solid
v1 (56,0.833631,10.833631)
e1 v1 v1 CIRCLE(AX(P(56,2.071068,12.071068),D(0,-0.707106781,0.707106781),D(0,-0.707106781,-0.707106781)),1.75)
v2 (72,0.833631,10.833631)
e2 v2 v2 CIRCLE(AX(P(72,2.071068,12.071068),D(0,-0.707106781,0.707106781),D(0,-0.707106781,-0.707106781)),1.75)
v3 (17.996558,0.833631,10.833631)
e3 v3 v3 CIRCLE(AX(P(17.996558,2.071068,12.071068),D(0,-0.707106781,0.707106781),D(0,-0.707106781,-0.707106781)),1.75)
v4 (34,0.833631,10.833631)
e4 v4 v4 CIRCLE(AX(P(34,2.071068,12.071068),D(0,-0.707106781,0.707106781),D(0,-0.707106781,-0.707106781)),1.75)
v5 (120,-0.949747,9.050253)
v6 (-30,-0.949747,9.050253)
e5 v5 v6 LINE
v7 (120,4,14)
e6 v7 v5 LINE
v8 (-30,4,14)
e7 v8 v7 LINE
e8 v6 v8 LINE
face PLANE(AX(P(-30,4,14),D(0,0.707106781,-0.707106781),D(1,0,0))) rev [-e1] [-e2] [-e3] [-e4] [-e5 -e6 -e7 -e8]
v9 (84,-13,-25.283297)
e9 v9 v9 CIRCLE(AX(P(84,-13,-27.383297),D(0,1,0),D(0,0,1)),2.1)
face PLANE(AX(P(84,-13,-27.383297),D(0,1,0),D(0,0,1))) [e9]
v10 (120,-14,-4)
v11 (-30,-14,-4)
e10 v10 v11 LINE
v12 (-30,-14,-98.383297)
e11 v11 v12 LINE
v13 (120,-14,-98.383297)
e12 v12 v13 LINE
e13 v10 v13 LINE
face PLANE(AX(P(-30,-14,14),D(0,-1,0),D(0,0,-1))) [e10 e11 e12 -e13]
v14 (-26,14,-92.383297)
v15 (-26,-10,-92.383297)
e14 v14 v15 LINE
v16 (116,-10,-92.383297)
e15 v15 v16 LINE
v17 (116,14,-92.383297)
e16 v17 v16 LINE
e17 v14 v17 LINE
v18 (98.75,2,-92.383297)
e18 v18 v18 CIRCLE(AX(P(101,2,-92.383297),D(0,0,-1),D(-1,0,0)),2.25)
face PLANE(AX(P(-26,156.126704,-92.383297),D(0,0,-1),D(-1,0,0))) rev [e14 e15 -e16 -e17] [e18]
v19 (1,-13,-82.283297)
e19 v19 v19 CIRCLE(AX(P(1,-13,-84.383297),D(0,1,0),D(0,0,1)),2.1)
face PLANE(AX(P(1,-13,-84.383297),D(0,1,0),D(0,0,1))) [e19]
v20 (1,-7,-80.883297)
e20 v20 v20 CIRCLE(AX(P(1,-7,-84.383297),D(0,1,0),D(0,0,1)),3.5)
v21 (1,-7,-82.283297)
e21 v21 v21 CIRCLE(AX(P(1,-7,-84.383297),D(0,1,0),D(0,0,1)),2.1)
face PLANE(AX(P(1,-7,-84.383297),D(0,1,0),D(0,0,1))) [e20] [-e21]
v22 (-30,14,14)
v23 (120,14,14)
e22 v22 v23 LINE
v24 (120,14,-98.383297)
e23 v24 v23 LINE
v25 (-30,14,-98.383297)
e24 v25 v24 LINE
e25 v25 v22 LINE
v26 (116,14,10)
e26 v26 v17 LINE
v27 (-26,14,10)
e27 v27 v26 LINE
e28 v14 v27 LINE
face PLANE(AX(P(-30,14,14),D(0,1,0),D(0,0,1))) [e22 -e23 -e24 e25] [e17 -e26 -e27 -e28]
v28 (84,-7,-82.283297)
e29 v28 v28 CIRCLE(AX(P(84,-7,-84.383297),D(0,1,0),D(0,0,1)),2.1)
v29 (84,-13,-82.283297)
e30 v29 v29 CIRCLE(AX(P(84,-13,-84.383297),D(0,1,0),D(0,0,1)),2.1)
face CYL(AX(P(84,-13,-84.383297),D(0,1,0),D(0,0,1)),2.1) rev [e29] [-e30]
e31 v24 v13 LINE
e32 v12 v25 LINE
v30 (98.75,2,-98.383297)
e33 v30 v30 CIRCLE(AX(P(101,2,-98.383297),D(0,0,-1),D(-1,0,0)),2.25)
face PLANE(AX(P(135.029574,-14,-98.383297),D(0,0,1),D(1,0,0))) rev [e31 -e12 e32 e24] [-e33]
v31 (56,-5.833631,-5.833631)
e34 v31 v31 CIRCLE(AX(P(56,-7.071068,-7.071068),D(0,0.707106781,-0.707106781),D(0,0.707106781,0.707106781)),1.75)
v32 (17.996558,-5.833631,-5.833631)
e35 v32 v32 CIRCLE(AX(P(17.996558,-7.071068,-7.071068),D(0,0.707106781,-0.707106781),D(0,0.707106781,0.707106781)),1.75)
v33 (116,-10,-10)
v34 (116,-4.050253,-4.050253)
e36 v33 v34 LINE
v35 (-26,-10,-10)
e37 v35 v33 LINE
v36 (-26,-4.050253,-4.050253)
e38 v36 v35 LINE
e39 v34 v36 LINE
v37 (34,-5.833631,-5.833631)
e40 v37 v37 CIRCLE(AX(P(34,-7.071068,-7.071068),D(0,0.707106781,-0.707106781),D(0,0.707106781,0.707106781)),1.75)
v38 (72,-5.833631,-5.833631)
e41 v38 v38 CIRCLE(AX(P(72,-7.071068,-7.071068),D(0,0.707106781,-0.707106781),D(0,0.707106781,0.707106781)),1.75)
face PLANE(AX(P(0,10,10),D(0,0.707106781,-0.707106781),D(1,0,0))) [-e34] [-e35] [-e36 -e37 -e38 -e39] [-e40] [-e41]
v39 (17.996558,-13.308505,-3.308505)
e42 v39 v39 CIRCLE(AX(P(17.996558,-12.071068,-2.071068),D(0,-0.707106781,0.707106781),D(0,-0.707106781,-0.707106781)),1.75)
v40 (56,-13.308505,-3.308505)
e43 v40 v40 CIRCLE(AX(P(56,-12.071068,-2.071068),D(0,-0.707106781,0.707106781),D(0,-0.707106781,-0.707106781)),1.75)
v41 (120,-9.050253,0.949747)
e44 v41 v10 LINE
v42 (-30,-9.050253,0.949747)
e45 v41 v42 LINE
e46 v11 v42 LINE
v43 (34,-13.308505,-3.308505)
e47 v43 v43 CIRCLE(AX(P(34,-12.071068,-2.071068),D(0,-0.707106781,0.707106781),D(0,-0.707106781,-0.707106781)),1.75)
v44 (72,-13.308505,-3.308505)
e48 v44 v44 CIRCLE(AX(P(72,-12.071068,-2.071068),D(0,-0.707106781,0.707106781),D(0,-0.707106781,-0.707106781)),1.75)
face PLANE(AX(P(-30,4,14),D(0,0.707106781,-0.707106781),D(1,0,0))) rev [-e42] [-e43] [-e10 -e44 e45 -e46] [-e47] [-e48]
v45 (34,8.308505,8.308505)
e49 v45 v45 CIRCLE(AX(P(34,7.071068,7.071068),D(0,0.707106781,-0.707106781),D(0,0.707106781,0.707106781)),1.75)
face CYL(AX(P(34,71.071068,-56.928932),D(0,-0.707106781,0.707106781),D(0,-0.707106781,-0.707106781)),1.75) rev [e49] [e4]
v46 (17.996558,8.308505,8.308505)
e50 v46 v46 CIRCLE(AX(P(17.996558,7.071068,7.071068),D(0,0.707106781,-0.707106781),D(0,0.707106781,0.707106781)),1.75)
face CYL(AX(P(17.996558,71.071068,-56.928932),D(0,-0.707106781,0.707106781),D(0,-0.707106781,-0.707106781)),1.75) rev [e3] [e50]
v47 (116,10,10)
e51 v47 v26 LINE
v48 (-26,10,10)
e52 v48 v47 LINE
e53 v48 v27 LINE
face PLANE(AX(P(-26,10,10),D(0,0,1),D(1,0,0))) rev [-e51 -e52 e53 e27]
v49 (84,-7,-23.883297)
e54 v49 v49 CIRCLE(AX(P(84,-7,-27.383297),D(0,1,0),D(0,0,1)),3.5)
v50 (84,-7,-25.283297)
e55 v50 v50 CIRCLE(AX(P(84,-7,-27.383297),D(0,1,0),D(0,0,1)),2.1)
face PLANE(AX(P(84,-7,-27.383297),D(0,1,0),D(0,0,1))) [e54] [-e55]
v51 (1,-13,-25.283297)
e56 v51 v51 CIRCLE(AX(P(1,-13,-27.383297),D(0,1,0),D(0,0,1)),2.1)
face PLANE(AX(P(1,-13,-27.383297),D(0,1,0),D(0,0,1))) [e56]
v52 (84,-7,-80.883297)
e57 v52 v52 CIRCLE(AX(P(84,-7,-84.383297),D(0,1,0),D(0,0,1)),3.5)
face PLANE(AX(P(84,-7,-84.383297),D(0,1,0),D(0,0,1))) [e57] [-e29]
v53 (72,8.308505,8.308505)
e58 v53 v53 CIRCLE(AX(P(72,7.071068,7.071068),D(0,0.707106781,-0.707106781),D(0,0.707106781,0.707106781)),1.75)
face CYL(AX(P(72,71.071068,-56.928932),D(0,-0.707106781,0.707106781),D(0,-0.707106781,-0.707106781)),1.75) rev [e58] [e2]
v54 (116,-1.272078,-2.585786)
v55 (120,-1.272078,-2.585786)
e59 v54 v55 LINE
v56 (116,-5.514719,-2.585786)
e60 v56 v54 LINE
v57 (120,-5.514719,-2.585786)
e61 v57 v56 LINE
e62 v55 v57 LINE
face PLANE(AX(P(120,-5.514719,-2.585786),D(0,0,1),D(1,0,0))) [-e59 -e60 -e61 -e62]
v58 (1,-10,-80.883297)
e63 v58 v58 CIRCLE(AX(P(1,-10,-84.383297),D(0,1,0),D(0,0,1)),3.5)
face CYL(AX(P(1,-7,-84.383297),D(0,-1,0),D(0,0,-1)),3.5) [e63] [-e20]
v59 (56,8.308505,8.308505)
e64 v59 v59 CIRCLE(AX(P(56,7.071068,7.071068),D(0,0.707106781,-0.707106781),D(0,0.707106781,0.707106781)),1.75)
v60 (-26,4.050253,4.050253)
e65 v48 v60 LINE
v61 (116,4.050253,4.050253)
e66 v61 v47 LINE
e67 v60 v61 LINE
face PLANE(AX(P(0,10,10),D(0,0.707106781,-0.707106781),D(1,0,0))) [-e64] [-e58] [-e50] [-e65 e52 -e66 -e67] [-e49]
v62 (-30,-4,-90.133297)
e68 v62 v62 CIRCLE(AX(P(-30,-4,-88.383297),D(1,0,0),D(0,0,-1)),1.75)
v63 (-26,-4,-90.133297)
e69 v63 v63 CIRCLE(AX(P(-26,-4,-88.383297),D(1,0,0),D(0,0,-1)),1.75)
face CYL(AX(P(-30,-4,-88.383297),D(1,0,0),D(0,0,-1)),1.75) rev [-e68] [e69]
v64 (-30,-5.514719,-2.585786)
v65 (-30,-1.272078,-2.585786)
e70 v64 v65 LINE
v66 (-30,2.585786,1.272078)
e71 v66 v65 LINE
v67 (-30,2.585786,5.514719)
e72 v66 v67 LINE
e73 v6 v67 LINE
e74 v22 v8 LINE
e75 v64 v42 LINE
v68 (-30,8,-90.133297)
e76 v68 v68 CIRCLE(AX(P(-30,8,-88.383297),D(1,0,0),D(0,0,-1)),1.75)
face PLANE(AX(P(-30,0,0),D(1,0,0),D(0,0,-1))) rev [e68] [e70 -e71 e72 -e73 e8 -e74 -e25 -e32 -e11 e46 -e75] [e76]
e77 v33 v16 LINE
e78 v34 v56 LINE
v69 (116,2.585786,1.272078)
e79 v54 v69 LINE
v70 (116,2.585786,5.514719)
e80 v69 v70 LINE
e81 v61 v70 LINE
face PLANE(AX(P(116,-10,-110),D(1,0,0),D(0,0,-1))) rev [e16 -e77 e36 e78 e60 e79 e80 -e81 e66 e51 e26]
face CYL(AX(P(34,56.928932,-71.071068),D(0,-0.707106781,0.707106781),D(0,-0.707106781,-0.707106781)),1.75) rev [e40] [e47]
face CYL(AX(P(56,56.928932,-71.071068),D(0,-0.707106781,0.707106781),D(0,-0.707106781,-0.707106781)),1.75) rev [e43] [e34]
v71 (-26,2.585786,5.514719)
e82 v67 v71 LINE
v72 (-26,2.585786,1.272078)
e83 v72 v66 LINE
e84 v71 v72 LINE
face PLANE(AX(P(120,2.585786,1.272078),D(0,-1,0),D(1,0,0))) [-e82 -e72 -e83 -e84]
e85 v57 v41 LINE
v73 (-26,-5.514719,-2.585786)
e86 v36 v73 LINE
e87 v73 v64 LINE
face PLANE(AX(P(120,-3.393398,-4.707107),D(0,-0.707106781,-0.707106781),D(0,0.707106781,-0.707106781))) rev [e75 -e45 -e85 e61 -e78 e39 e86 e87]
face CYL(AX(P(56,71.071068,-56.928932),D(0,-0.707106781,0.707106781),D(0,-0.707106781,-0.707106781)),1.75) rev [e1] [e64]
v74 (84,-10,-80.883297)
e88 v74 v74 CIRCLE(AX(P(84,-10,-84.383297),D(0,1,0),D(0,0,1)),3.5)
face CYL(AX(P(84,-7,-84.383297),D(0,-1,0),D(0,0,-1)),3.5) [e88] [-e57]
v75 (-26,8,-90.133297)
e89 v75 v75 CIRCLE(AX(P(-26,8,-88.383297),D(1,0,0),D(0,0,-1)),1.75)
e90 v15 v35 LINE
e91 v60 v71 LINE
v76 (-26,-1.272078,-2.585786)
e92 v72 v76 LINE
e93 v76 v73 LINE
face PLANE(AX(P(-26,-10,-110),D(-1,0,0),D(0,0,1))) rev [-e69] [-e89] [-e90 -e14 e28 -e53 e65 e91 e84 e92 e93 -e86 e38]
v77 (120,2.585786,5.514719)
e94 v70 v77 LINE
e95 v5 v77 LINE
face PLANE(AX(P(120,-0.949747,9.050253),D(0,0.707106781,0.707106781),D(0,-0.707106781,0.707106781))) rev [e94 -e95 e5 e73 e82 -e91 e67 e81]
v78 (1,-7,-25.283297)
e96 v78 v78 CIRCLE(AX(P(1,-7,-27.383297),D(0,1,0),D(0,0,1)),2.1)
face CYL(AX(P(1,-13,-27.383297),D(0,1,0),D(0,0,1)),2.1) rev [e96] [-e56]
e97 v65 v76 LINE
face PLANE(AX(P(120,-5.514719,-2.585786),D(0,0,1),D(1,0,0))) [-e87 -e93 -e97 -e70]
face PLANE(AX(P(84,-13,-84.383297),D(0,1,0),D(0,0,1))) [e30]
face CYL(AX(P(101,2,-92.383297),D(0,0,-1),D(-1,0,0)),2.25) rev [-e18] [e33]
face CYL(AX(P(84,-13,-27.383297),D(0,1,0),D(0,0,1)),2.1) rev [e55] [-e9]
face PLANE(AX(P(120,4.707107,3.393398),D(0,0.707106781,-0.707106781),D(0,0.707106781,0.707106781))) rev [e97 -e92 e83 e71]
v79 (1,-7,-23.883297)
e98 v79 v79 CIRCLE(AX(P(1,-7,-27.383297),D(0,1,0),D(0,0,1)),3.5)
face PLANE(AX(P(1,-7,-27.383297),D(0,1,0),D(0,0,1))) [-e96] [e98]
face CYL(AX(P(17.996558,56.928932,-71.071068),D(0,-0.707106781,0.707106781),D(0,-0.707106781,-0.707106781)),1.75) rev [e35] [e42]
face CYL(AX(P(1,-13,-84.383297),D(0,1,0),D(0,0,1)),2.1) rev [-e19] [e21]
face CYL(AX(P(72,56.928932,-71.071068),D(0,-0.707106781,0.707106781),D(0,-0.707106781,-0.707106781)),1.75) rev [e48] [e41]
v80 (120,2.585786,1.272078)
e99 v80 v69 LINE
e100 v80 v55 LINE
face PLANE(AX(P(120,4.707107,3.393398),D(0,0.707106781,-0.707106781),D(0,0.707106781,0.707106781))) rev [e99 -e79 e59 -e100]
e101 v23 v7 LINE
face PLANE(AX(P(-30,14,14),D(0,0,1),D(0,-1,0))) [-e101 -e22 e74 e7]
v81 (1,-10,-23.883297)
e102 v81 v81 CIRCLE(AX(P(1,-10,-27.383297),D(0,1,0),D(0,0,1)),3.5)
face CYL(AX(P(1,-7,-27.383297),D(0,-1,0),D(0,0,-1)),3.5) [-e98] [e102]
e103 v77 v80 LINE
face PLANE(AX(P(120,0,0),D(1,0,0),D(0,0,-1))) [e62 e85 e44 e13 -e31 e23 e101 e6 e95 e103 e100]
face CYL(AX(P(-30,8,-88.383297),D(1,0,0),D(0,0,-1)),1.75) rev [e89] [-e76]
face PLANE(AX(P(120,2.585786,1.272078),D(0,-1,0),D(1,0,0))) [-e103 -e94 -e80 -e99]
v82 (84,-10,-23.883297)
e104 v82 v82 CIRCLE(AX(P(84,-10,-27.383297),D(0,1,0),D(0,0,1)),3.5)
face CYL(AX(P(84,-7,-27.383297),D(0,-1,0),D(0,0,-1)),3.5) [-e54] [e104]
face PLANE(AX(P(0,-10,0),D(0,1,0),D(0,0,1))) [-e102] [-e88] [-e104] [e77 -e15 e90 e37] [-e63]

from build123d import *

# Parameters (mm, degrees)
BOSS_EXTRUDE1_DEPTH      = 120
BOSS_EXTRUDE1_DEPTH_BACK = 30
SKETCH1_W                = 28
SKETCH1_H                = 28
CHAMFER1_SIZE            = 18
SKETCH2_W                = 150
SKETCH2_H                = 28
BOSS_EXTRUDE2_DEPTH      = 100
SKETCH3_W                = 142
SKETCH3_H                = 100
CUT_EXTRUDE1_DEPTH       = 24
SKETCH4_W                = 142
SKETCH4_H                = 20
CUT_EXTRUDE2_DEPTH       = 4
CHAMFER2_SIZE            = 20
SKETCH6_R                = 1.75
CUT_EXTRUDE3_DEPTH       = 171.064693573
SKETCH10_W               = 165.029573665
SKETCH10_H               = 25.818236019
CUT_EXTRUDE7_DEPTH       = 168.868996542
CUT_EXTRUDE8_DEPTH       = 180.931301028
CHAMFER3_SIZE            = 3
SKETCH12_W               = 142
SKETCH12_H               = 11.455844122
CUT_EXTRUDE9_DEPTH       = 160.52775952
SKETCH13_W               = 142
SKETCH13_H               = 6
BOSS_EXTRUDE4_DEPTH      = 24
SKETCH14_R               = 2.25
CUT_EXTRUDE10_DEPTH      = 6
SKETCH15_R               = 1.75
CUT_EXTRUDE11_DEPTH      = 177.610512398
SKETCH17_R               = 3.5
BOSS_EXTRUDE5_DEPTH      = 3
SKETCH18_R               = 2.1
CUT_EXTRUDE12_DEPTH      = 6


with BuildPart() as part:
    # Sketch1 → Boss-Extrude1 (new, two sides: drawn at the far end of the back side and taken through both)
    with BuildSketch(Plane(origin=(0, 0, 0), x_dir=(0, 0, -1), z_dir=(1, 0, 0)).offset(-BOSS_EXTRUDE1_DEPTH_BACK)):
        Rectangle(SKETCH1_W, SKETCH1_H)
    extrude(amount=BOSS_EXTRUDE1_DEPTH + BOSS_EXTRUDE1_DEPTH_BACK)

    # Chamfer1
    chamfer1_edges = [part.edges().sort_by_distance(p)[0] for p in [
        (45, -14, 14),
    ]]
    chamfer(chamfer1_edges, length=CHAMFER1_SIZE)

    # Sketch2 → Boss-Extrude2 (add)
    with BuildSketch(Plane(origin=(0, 0, -14), x_dir=(-1, 0, 0), z_dir=(0, 0, -1))):
        with Locations((-45, 0)):
            Rectangle(SKETCH2_W, SKETCH2_H)
    extrude(amount=BOSS_EXTRUDE2_DEPTH)

    # Sketch3 → Cut-Extrude1 (cut)
    with BuildSketch(Plane(origin=(0, 14, 0), x_dir=(1, 0, 0), z_dir=(0, 1, 0))):
        with Locations((45, 60)):
            Rectangle(SKETCH3_W, SKETCH3_H)
    extrude(amount=-CUT_EXTRUDE1_DEPTH, mode=Mode.SUBTRACT)

    # Sketch4 → Cut-Extrude2 (cut)
    with BuildSketch(Plane(origin=(0, 14, 0), x_dir=(1, 0, 0), z_dir=(0, 1, 0))):
        with Locations((45, 0)):
            Rectangle(SKETCH4_W, SKETCH4_H)
    extrude(amount=-CUT_EXTRUDE2_DEPTH, mode=Mode.SUBTRACT)

    # Chamfer2
    chamfer2_edges = [part.edges().sort_by_distance(p)[0] for p in [
        (45, 10, -10),
    ]]
    chamfer(chamfer2_edges, length=CHAMFER2_SIZE - 0.0001)  # a hair under: the kernel refuses the full size

    # Sketch6 → Cut-Extrude3 (cut, through all)
    with BuildSketch(Plane(origin=(0, -5, 5), x_dir=(1, 0, 0), z_dir=(0, -0.7071067811865465, 0.7071067811865487))):
        with Locations(Location((34, 10, 0), (0, 0, 270))):
            Circle(SKETCH6_R)
        with Locations(Location((17.996557672, 10, 0), (0, 0, 270))):
            Circle(SKETCH6_R)
        with Locations(Location((56, 10, 0), (0, 0, 270))):
            Circle(SKETCH6_R)
        with Locations(Location((72, 10, 0), (0, 0, 270))):
            Circle(SKETCH6_R)
        with Locations(Location((72, -10, 0), (0, 0, 270))):
            Circle(SKETCH6_R)
        with Locations(Location((56, -10, 0), (0, 0, 270))):
            Circle(SKETCH6_R)
        with Locations(Location((34, -10, 0), (0, 0, 270))):
            Circle(SKETCH6_R)
        with Locations(Location((17.996557672, -10, 0), (0, 0, 270))):
            Circle(SKETCH6_R)
    extrude(amount=-CUT_EXTRUDE3_DEPTH, mode=Mode.SUBTRACT)

    # Sketch10 → Cut-Extrude7 (cut, through all)
    with BuildSketch(Plane(origin=(0, 14, 0), x_dir=(1, 0, 0), z_dir=(0, 1, 0))):
        with Locations((52.514786833, 111.292414811)):
            Rectangle(SKETCH10_W, SKETCH10_H)
    extrude(amount=-CUT_EXTRUDE7_DEPTH, mode=Mode.SUBTRACT)

    # Sketch11 → Cut-Extrude8 (cut, through all)
    with BuildSketch(Plane.ZY.offset(30)):
        Polygon((9.050252532, -0.949747468), (3.393398282, 4.707106781), (-4.707106781, -3.393398282), (0.949747468, -9.050252532), align=None)
    extrude(amount=-CUT_EXTRUDE8_DEPTH, mode=Mode.SUBTRACT)

    # Chamfer3
    chamfer3_edges = [part.edges().sort_by_distance(p)[0] for p in [
        (-28, 4.707106781, 3.393398282),
        (-28, -3.393398282, -4.707106781),
    ]]
    chamfer(chamfer3_edges, length=CHAMFER3_SIZE)

    # Sketch12 → Cut-Extrude9 (cut, through all)
    with BuildSketch(Plane(origin=(0, -5, 5), x_dir=(-1, 0, 0), z_dir=(0, -0.7071067811865513, 0.7071067811865437))):
        with Locations((-45, 0)):
            Rectangle(SKETCH12_W, SKETCH12_H)
    extrude(amount=-CUT_EXTRUDE9_DEPTH, mode=Mode.SUBTRACT)

    # Sketch13 → Boss-Extrude4 (add)
    with BuildSketch(Plane(origin=(0, -10, 0), x_dir=(1, 0, 0), z_dir=(0, 1, 0))):
        with Locations((45, 95.383296801)):
            Rectangle(SKETCH13_W, SKETCH13_H)
    extrude(amount=BOSS_EXTRUDE4_DEPTH)

    # Sketch14 → Cut-Extrude10 (cut)
    with BuildSketch(Plane(origin=(0, 0, -98.383296801), x_dir=(-1, 0, 0), z_dir=(0, 0, -1))):
        with Locations((-101, 2)):
            Circle(SKETCH14_R)
    extrude(amount=-CUT_EXTRUDE10_DEPTH, mode=Mode.SUBTRACT)

    # Sketch15 → Cut-Extrude11 (cut, through all)
    with BuildSketch(Plane(origin=(-26, 0, 0), x_dir=(0, 0, -1), z_dir=(1, 0, 0))):
        with Locations((88.383296801, 8)):
            Circle(SKETCH15_R)
        with Locations((88.383296801, -4)):
            Circle(SKETCH15_R)
    extrude(amount=-CUT_EXTRUDE11_DEPTH, mode=Mode.SUBTRACT)

    # Sketch17 → Boss-Extrude5 (add)
    with BuildSketch(Plane(origin=(0, -10, 0), x_dir=(1, 0, 0), z_dir=(0, 1, 0))):
        with Locations(Location((1, 84.383296801, 0), (0, 0, 270))):
            Circle(SKETCH17_R)
        with Locations(Location((84, 84.383296801, 0), (0, 0, 270))):
            Circle(SKETCH17_R)
        with Locations(Location((84, 27.383296801, 0), (0, 0, 270))):
            Circle(SKETCH17_R)
        with Locations(Location((1, 27.383296801, 0), (0, 0, 270))):
            Circle(SKETCH17_R)
    extrude(amount=BOSS_EXTRUDE5_DEPTH)

    # Sketch18 → Cut-Extrude12 (cut)
    with BuildSketch(Plane(origin=(0, -7, 0), x_dir=(1, 0, 0), z_dir=(0, 1, 0))):
        with Locations(Location((84, 84.383296801, 0), (0, 0, 270))):
            Circle(SKETCH18_R)
        with Locations(Location((84, 27.383296801, 0), (0, 0, 270))):
            Circle(SKETCH18_R)
        with Locations(Location((1, 27.383296801, 0), (0, 0, 270))):
            Circle(SKETCH18_R)
        with Locations(Location((1, 84.383296801, 0), (0, 0, 270))):
            Circle(SKETCH18_R)
    extrude(amount=-CUT_EXTRUDE12_DEPTH, mode=Mode.SUBTRACT)


solid = part.part
